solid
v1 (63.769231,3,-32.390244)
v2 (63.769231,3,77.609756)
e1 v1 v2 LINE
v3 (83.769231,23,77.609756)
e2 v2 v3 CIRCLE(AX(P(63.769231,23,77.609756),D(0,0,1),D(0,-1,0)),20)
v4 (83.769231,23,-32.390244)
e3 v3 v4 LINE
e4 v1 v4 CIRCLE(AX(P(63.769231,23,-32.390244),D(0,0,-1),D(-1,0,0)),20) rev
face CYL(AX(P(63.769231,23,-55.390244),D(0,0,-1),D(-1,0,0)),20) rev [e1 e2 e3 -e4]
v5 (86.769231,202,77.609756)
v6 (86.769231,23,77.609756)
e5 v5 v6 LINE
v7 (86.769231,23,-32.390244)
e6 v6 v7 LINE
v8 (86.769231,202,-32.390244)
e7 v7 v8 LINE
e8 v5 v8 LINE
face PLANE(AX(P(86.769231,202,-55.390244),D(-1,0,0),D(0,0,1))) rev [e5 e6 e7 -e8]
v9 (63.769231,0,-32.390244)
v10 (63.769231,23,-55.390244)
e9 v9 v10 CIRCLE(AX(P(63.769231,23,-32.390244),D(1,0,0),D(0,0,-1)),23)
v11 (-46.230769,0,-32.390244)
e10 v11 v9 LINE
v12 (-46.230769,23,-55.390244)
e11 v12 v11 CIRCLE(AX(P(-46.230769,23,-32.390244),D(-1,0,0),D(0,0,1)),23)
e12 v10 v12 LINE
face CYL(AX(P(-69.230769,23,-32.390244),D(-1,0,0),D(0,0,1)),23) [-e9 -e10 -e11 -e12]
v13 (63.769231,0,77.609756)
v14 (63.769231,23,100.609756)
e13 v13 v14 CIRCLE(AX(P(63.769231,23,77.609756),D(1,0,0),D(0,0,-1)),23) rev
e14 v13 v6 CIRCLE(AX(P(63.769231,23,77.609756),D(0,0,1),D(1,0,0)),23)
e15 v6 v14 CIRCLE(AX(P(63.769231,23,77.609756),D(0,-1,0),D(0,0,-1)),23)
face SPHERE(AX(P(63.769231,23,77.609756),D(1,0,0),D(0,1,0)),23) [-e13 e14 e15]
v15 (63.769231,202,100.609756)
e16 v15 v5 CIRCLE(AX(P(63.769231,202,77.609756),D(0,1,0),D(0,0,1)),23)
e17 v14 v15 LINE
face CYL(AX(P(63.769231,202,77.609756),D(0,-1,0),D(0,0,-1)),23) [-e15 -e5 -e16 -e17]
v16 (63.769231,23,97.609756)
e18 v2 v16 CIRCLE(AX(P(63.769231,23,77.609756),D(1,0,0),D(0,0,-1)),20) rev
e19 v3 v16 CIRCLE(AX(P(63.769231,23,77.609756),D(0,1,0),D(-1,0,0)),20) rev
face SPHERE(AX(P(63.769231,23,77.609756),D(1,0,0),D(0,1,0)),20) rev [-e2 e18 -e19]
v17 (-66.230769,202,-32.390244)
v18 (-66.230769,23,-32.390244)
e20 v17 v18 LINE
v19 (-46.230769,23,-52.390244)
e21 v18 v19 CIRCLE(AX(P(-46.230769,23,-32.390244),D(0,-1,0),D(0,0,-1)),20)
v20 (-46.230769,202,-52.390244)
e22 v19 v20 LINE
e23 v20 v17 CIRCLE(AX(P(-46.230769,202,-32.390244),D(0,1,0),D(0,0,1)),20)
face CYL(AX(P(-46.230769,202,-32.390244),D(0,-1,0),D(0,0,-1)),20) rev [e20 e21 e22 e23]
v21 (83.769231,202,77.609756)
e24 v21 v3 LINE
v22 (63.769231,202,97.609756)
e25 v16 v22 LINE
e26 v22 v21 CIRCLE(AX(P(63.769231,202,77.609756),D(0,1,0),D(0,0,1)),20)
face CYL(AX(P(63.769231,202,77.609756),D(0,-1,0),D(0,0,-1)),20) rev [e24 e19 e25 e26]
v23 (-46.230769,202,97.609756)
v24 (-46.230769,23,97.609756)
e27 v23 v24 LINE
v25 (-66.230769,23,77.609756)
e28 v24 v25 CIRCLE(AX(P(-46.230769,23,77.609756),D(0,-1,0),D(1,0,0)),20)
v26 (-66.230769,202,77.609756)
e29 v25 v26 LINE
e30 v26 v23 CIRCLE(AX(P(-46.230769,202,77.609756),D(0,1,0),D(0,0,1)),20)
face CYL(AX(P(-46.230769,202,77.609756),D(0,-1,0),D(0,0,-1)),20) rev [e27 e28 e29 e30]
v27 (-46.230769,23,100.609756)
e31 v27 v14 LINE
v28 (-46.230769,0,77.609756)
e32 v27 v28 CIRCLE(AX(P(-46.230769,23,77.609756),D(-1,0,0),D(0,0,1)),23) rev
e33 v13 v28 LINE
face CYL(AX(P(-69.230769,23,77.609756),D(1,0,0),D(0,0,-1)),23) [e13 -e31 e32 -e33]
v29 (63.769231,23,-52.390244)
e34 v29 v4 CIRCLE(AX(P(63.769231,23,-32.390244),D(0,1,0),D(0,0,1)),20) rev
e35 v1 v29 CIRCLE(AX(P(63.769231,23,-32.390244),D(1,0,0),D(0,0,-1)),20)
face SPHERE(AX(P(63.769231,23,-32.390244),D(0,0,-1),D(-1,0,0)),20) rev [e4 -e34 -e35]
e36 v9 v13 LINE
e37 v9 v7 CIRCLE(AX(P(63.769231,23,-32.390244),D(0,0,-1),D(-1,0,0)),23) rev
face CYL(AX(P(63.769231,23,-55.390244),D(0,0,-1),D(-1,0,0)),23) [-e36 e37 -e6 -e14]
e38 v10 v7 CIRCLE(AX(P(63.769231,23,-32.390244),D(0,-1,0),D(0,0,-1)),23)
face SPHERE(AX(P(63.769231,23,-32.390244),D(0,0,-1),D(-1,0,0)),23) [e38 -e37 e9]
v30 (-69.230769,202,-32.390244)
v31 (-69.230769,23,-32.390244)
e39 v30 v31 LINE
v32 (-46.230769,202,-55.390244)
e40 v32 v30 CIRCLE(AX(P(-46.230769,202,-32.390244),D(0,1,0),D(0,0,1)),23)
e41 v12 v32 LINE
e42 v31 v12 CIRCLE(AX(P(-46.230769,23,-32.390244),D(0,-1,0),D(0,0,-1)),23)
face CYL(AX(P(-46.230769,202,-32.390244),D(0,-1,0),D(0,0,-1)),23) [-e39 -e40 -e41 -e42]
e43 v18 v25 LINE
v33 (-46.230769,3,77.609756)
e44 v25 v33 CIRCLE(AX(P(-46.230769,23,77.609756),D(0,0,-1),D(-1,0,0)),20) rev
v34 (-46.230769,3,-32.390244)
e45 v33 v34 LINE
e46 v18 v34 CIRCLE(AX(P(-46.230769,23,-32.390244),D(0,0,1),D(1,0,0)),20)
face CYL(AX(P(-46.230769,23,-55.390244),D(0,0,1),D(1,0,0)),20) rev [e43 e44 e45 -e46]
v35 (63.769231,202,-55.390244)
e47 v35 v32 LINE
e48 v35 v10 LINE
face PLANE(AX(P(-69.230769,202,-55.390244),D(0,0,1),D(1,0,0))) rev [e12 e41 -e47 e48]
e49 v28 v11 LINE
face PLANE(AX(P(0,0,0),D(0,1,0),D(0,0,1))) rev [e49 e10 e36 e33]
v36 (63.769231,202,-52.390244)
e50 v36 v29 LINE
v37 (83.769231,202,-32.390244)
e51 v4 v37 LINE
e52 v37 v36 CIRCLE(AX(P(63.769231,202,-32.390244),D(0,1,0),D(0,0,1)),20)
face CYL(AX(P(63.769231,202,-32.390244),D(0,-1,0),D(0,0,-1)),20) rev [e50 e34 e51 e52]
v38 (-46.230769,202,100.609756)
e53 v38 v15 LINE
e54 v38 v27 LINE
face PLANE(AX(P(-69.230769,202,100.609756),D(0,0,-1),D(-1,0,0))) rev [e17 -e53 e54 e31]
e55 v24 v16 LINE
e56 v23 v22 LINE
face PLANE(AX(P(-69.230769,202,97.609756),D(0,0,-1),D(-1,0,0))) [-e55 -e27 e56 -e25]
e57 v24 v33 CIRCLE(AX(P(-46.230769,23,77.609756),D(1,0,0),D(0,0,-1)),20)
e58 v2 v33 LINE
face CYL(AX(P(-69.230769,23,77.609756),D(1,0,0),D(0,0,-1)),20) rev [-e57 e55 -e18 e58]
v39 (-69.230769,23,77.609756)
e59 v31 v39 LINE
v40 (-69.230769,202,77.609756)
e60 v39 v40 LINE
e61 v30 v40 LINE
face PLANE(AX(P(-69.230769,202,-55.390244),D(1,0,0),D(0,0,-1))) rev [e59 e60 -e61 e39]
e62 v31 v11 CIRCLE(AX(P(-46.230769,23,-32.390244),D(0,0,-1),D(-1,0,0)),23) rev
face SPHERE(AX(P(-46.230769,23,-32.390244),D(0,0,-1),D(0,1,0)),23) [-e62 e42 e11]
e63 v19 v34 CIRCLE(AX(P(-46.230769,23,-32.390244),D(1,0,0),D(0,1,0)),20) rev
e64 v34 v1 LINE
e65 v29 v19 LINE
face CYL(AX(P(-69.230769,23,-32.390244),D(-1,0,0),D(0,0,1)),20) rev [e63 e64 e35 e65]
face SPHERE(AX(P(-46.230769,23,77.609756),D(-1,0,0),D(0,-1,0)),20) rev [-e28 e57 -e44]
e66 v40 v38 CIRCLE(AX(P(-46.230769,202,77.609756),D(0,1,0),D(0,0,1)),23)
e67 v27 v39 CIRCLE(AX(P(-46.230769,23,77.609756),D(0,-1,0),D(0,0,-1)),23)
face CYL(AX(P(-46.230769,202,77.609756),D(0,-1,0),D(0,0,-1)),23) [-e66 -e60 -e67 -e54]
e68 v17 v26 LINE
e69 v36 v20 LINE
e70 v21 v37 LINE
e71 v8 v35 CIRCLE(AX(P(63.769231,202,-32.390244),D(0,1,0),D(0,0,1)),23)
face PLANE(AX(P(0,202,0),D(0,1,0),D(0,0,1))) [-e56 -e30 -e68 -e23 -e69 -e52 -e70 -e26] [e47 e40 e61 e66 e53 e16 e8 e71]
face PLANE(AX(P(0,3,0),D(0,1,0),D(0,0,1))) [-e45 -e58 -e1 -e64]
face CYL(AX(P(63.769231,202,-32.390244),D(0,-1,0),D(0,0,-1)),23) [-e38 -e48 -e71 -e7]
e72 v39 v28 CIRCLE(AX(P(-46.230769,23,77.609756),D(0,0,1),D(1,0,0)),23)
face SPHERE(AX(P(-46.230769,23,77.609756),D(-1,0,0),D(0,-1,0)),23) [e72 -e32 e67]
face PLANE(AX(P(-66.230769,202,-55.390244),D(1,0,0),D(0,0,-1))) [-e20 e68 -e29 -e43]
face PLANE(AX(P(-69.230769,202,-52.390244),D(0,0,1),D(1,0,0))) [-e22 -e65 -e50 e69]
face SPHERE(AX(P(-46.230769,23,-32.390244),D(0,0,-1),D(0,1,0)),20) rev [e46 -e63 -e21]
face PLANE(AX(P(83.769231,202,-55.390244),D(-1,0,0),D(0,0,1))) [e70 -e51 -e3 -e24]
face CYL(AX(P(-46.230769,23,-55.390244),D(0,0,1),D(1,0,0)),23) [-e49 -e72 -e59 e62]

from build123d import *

# Parameters (mm, degrees)
SKETCH1_W           = 156
SKETCH1_H           = 156
BOSS_EXTRUDE1_DEPTH = 202
FILLET1_R           = 23
SHELL1_T            = -3


with BuildPart() as part:
    # Sketch1 → Boss-Extrude1 (new body)
    with BuildSketch(Plane(origin=(0, 0, 0), x_dir=(1, 0, 0), z_dir=(0, 1, 0))):
        with Locations((8.769230769, -22.609756098)):
            Rectangle(SKETCH1_W, SKETCH1_H)
    extrude(amount=BOSS_EXTRUDE1_DEPTH)

    # Fillet1
    fillet1_edges = [part.edges().sort_by_distance(p)[0] for p in [
        (8.769230769, 0, -55.390243902),
        (86.769230769, 0, 22.609756098),
        (8.769230769, 0, 100.609756098),
        (-69.230769231, 0, 22.609756098),
        (-69.230769231, 101, -55.390243902),
        (86.769230769, 101, -55.390243902),
        (86.769230769, 101, 100.609756098),
        (-69.230769231, 101, 100.609756098),
    ]]
    fillet(fillet1_edges, radius=FILLET1_R)

    # Shell1
    shell1_openings = [part.faces().sort_by_distance(p)[0] for p in [
        (8.769230769, 202, 22.609756098),
    ]]
    offset(amount=SHELL1_T, openings=shell1_openings, kind=Kind.INTERSECTION)


solid = part.part
